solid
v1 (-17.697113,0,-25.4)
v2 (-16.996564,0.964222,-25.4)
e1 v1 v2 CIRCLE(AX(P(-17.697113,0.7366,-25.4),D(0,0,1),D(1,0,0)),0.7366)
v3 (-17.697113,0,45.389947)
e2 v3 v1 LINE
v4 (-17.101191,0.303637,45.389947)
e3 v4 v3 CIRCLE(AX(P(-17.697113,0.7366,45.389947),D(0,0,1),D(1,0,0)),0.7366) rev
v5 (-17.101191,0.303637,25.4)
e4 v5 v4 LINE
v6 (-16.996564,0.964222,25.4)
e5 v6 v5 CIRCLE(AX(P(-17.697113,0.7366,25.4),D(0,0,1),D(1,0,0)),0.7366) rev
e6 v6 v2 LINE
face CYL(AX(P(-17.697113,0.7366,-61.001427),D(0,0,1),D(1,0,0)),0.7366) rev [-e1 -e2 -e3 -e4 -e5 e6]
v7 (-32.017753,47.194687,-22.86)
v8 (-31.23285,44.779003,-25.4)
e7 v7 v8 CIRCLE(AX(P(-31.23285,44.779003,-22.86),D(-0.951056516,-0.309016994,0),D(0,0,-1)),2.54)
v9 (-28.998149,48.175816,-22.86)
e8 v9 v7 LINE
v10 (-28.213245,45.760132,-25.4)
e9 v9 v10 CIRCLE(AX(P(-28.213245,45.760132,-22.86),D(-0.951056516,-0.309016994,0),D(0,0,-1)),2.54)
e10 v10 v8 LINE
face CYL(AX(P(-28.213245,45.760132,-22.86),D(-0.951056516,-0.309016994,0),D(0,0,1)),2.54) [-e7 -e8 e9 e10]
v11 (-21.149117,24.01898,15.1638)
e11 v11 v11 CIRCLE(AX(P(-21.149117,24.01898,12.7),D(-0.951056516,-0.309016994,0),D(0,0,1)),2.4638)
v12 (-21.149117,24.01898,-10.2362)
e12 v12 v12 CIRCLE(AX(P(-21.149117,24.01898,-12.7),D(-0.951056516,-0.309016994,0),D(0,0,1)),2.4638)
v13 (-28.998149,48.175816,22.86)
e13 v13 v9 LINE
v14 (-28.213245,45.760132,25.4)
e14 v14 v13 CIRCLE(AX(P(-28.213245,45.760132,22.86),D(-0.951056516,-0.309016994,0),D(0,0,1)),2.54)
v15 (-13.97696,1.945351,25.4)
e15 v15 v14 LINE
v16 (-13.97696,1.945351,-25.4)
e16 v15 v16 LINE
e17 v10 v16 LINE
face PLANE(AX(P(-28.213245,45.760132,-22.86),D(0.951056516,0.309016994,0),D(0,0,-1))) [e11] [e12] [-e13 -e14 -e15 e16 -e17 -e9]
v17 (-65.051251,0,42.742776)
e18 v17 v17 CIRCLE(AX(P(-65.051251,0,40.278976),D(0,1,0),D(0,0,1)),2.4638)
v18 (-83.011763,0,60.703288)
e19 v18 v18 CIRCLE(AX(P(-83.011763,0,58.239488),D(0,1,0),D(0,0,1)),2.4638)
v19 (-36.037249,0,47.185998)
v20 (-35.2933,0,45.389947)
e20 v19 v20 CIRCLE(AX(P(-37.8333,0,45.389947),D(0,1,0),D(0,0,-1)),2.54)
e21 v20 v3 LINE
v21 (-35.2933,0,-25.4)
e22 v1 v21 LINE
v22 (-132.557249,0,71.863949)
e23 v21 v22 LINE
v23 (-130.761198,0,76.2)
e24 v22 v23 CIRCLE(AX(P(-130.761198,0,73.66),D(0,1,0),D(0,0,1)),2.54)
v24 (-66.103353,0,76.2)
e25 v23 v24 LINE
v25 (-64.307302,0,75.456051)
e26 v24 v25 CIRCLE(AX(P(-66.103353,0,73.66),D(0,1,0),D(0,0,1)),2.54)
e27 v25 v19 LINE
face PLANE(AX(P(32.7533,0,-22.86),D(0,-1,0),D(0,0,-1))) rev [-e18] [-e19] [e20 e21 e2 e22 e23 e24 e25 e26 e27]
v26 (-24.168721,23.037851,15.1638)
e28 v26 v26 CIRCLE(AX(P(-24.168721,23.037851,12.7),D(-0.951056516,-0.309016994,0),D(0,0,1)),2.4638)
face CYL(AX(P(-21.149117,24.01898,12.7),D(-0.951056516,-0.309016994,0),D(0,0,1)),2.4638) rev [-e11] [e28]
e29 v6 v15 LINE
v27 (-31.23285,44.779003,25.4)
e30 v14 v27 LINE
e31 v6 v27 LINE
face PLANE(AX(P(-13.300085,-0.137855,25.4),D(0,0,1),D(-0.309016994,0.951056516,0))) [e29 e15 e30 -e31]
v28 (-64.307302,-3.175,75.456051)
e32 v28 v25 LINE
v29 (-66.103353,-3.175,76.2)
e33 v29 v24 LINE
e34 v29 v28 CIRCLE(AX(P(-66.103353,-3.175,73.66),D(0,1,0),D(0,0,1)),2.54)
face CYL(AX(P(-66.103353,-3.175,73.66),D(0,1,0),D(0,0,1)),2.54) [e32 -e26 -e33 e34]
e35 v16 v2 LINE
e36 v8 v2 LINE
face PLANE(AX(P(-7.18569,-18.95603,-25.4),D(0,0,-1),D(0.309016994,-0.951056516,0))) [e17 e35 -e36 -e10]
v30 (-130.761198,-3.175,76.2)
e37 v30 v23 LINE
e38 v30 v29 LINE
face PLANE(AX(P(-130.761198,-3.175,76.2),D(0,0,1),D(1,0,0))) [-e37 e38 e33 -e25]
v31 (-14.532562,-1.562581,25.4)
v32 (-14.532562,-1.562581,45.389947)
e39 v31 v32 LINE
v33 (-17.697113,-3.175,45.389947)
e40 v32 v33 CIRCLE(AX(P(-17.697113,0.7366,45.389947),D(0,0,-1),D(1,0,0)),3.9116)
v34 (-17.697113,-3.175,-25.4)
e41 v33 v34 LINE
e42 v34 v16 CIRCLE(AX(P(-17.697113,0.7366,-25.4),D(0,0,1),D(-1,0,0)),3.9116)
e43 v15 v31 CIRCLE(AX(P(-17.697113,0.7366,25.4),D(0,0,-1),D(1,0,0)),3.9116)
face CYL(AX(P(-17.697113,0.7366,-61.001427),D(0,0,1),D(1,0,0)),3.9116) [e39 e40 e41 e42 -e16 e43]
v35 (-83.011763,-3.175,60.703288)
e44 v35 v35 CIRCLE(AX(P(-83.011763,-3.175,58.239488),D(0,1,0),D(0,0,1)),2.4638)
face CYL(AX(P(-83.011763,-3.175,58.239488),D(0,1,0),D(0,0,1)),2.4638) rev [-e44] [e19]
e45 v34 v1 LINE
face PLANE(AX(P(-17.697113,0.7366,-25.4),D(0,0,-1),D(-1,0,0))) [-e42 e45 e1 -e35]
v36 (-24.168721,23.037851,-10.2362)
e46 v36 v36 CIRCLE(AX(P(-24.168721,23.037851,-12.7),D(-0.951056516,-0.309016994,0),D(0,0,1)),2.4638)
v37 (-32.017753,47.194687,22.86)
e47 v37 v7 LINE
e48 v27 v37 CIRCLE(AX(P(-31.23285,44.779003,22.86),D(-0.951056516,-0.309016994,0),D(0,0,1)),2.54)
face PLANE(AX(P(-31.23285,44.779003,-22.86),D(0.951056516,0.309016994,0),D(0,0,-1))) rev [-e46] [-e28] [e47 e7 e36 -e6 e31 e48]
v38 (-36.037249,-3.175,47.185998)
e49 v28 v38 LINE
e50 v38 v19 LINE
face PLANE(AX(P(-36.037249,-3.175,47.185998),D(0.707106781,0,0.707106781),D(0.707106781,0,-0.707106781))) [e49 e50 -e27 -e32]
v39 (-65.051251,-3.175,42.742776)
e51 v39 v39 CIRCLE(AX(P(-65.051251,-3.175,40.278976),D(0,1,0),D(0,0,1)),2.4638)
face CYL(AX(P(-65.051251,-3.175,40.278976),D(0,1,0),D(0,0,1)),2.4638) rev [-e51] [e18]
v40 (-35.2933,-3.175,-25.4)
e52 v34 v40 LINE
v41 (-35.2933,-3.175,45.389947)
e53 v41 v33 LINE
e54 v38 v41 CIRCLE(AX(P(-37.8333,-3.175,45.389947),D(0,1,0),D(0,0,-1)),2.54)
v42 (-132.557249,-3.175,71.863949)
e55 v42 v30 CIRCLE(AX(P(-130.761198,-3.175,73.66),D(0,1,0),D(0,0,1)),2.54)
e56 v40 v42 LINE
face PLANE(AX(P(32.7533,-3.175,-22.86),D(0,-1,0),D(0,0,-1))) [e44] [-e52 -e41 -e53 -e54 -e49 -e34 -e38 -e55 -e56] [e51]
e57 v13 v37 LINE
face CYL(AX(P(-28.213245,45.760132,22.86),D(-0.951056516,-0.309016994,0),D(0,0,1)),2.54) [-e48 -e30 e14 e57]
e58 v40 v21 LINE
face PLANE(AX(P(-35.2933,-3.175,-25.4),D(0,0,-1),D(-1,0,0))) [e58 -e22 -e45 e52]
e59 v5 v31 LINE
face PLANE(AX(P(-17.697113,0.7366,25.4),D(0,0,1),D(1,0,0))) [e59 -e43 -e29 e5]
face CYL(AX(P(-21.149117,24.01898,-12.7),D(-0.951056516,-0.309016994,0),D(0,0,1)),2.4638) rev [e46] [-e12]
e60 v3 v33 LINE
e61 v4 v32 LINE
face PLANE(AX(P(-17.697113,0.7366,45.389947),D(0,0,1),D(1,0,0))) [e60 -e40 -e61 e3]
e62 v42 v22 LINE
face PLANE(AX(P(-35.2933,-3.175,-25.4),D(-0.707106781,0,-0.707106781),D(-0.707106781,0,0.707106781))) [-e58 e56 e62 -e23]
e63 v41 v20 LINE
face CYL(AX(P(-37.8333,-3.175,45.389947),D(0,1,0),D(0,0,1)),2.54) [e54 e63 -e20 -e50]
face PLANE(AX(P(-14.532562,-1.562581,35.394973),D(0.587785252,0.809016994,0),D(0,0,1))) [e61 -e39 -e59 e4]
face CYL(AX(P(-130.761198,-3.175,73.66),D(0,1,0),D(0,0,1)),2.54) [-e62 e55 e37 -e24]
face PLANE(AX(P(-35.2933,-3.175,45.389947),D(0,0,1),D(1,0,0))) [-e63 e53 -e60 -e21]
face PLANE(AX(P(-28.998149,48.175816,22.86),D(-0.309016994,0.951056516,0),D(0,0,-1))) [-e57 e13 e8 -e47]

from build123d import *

# Parameters (mm, degrees)
SKETCH1_R                  = 2.4638
BASE_FLANGE1_DEPTH         = 3.175
SKETCHED_START             = -25.4
SKETCHED_BEND1_DEPTH       = 70.78994652
SKETCHED_START_2           = 25.4
SKETCHED_BEND1_2_DEPTH     = 19.98994652
SKETCHED_START_3           = -10.2361999
SKETCHED_BEND1_3_DEPTH     = 20.4723998
SKETCHED_START_4           = -22.86
SKETCHED_BEND1_4_DEPTH     = 7.6961999
SKETCHED_START_5           = 15.1638001
SKETCHED_BEND1_5_DEPTH     = 7.6961999
SKETCHED_BEND1_6_DEPTH     = 70.78994652
SKETCHED_BEND1_7_DEPTH     = 50.8
SKETCHED_START_6           = -15.866732383
SKETCHED_BEND1_8_OUTLINE_R = 2.4638
SKETCHED_BEND1_8_DEPTH     = 3.866732383


with BuildPart() as part:
    # Base-Flange1: sheet metal written as solids
    # Sketch1 → Base-Flange1 (new body)
    with BuildSketch(Plane(origin=(0, 0, 0), x_dir=(1, 0, 0), z_dir=(0, 1, 0))):
        with BuildLine():
            Line((-35.2933, 25.4), (-132.557248776, -71.863948776))
            ThreePointArc((-132.557248776, -71.863948776), (-133.107851564, -74.632015918), (-130.761197552, -76.2))
            Line((-130.761197552, -76.2), (-66.10335348, -76.2))
            ThreePointArc((-66.10335348, -76.2), (-65.131337562, -76.006654013), (-64.307302256, -75.456051224))
            Line((-64.307302256, -75.456051224), (-36.037248776, -47.185997744))
            ThreePointArc((-36.037248776, -47.185997744), (-35.486645987, -46.361962438), (-35.2933, -45.38994652))
            Line((-35.2933, -45.38994652), (-15.5067, -45.38994652))
            Line((-15.5067, -45.38994652), (-15.5067, -25.4))
            Line((-15.5067, -25.4), (32.7533, -25.4))
            ThreePointArc((32.7533, -25.4), (34.549351224, -24.656051224), (35.2933, -22.86))
            Line((35.2933, -22.86), (35.2933, 22.86))
            ThreePointArc((35.2933, 22.86), (34.549351224, 24.656051224), (32.7533, 25.4))
            Line((32.7533, 25.4), (-35.2933, 25.4))
        make_face()
        with Locations(Location((-83.011763274, -58.239487758, 0), (0, 0, 270))):
            Circle(SKETCH1_R, mode=Mode.SUBTRACT)
        with Locations(Location((-65.051251031, -40.278975516, 0), (0, 0, 270))):
            Circle(SKETCH1_R, mode=Mode.SUBTRACT)
        with Locations(Location((9.8933, -12.7, 0), (0, 0, 270))):
            Circle(SKETCH1_R, mode=Mode.SUBTRACT)
        with Locations(Location((9.8933, 12.7, 0), (0, 0, 270))):
            Circle(SKETCH1_R, mode=Mode.SUBTRACT)
    extrude(amount=-BASE_FLANGE1_DEPTH)

    # Sketched Bend1: read off the stored shape, not the designer's step
    # Sketched Bend1 outline → Sketched Bend1 (cut)
    with BuildSketch(Plane.XY.offset(SKETCHED_START)):
        with BuildLine():
            Line((35.2933, 0), (-13.855493847, 0))
            ThreePointArc((-13.855493847, 0), (-15.205192704, -2.278520157), (-17.697112646, -3.175))
            Line((-17.697112646, -3.175), (35.2933, -3.175))
            Line((35.2933, -3.175), (35.2933, 0))
        make_face()
    extrude(amount=SKETCHED_BEND1_DEPTH, mode=Mode.SUBTRACT)

    # Sketched Bend1 2 outline → Sketched Bend1 2 (cut)
    with BuildSketch(Plane.XY.offset(SKETCHED_START_2)):
        Polygon((-15.5067, -0.854827941), (-15.5067, 0), (-16.683269724, 0), align=None)
    extrude(amount=SKETCHED_BEND1_2_DEPTH, mode=Mode.SUBTRACT)

    # Sketched Bend1 3 outline → Sketched Bend1 3 (add)
    with BuildSketch(Plane.XY.offset(SKETCHED_START_3)):
        with BuildLine():
            ThreePointArc((-13.855493847, 0), (-13.793115407, 0.98036242), (-13.976959977, 1.945350875))
            Line((-13.976959977, 1.945350875), (-28.998148559, 48.175815683))
            Line((-28.998148559, 48.175815683), (-32.017752998, 47.194686726))
            Line((-32.017752998, 47.194686726), (-16.996564416, 0.964221918))
            ThreePointArc((-16.996564416, 0.964221918), (-17.101190728, 0.303637383), (-17.697112646, 0))
            Line((-17.697112646, 0), (-13.855493847, 0))
        make_face()
    extrude(amount=SKETCHED_BEND1_3_DEPTH)

    # Sketched Bend1 4 outline → Sketched Bend1 4 (add)
    with BuildSketch(Plane.XY.offset(SKETCHED_START_4)):
        with BuildLine():
            ThreePointArc((-13.855493847, 0), (-13.793115407, 0.98036242), (-13.976959977, 1.945350875))
            Line((-13.976959977, 1.945350875), (-28.998148559, 48.175815683))
            Line((-28.998148559, 48.175815683), (-32.017752998, 47.194686726))
            Line((-32.017752998, 47.194686726), (-16.996564416, 0.964221918))
            ThreePointArc((-16.996564416, 0.964221918), (-17.101190728, 0.303637383), (-17.697112646, 0))
            Line((-17.697112646, 0), (-13.855493847, 0))
        make_face()
    extrude(amount=SKETCHED_BEND1_4_DEPTH)

    # Sketched Bend1 5 outline → Sketched Bend1 5 (add)
    with BuildSketch(Plane.XY.offset(SKETCHED_START_5)):
        with BuildLine():
            ThreePointArc((-13.855493847, 0), (-13.793115407, 0.98036242), (-13.976959977, 1.945350875))
            Line((-13.976959977, 1.945350875), (-28.998148559, 48.175815683))
            Line((-28.998148559, 48.175815683), (-32.017752998, 47.194686726))
            Line((-32.017752998, 47.194686726), (-16.996564416, 0.964221918))
            ThreePointArc((-16.996564416, 0.964221918), (-17.101190728, 0.303637383), (-17.697112646, 0))
            Line((-17.697112646, 0), (-13.855493847, 0))
        make_face()
    extrude(amount=SKETCHED_BEND1_5_DEPTH)

    # Sketched Bend1 6 outline → Sketched Bend1 6 (add)
    with BuildSketch(Plane.XY.offset(SKETCHED_START)):
        with BuildLine():
            ThreePointArc((-15.5067, -2.504188021), (-14.978553355, -2.0758811), (-14.532561771, -1.562580793))
            Line((-14.532561771, -1.562580793), (-15.5067, -0.854827941))
            Line((-15.5067, -0.854827941), (-15.5067, -2.504188021))
        make_face()
        with BuildLine():
            Line((-17.697112646, 0), (-16.683269724, 0))
            Line((-16.683269724, 0), (-17.101190728, 0.303637383))
            ThreePointArc((-17.101190728, 0.303637383), (-17.362703244, 0.080284594), (-17.697112646, 0))
        make_face()
    extrude(amount=SKETCHED_BEND1_6_DEPTH)

    # Sketched Bend1 7 outline → Sketched Bend1 7 (add)
    with BuildSketch(Plane.XY.offset(SKETCHED_START)):
        with BuildLine():
            ThreePointArc((-13.855493847, 0), (-13.793115407, 0.98036242), (-13.976959977, 1.945350875))
            Line((-13.976959977, 1.945350875), (-28.998148559, 48.175815683))
            Line((-28.998148559, 48.175815683), (-32.017752998, 47.194686726))
            Line((-32.017752998, 47.194686726), (-16.996564416, 0.964221918))
            ThreePointArc((-16.996564416, 0.964221918), (-16.969581414, 0.621370373), (-17.101190728, 0.303637383))
            Line((-17.101190728, 0.303637383), (-16.683269724, 0))
            Line((-16.683269724, 0), (-13.855493847, 0))
        make_face()
    extrude(amount=SKETCHED_BEND1_7_DEPTH)

    # Sketched Bend1 8 outline → Sketched Bend1 8 (cut)
    with BuildSketch(Plane(origin=(0, 0, 0), x_dir=(-0.30901699437495117, 0.9510565162951524, 0), z_dir=(0.9510565162951524, 0.3090169943749511, 0)).offset(SKETCHED_START_6)):
        with BuildLine():
            Line((54.778844143, -25.4), (54.778844143, -22.86))
            ThreePointArc((54.778844143, -22.86), (54.034895367, -24.656051224), (52.238844143, -25.4))
            Line((52.238844143, -25.4), (54.778844143, -25.4))
        make_face()
        with BuildLine():
            ThreePointArc((52.238844143, 25.4), (54.034895367, 24.656051224), (54.778844143, 22.86))
            Line((54.778844143, 22.86), (54.778844143, 25.4))
            Line((54.778844143, 25.4), (52.238844143, 25.4))
        make_face()
        with Locations((29.378844143, 12.7)):
            Circle(SKETCHED_BEND1_8_OUTLINE_R)
        with Locations((29.378844143, -12.7)):
            Circle(SKETCHED_BEND1_8_OUTLINE_R)
    extrude(amount=SKETCHED_BEND1_8_DEPTH, mode=Mode.SUBTRACT)


solid = part.part
